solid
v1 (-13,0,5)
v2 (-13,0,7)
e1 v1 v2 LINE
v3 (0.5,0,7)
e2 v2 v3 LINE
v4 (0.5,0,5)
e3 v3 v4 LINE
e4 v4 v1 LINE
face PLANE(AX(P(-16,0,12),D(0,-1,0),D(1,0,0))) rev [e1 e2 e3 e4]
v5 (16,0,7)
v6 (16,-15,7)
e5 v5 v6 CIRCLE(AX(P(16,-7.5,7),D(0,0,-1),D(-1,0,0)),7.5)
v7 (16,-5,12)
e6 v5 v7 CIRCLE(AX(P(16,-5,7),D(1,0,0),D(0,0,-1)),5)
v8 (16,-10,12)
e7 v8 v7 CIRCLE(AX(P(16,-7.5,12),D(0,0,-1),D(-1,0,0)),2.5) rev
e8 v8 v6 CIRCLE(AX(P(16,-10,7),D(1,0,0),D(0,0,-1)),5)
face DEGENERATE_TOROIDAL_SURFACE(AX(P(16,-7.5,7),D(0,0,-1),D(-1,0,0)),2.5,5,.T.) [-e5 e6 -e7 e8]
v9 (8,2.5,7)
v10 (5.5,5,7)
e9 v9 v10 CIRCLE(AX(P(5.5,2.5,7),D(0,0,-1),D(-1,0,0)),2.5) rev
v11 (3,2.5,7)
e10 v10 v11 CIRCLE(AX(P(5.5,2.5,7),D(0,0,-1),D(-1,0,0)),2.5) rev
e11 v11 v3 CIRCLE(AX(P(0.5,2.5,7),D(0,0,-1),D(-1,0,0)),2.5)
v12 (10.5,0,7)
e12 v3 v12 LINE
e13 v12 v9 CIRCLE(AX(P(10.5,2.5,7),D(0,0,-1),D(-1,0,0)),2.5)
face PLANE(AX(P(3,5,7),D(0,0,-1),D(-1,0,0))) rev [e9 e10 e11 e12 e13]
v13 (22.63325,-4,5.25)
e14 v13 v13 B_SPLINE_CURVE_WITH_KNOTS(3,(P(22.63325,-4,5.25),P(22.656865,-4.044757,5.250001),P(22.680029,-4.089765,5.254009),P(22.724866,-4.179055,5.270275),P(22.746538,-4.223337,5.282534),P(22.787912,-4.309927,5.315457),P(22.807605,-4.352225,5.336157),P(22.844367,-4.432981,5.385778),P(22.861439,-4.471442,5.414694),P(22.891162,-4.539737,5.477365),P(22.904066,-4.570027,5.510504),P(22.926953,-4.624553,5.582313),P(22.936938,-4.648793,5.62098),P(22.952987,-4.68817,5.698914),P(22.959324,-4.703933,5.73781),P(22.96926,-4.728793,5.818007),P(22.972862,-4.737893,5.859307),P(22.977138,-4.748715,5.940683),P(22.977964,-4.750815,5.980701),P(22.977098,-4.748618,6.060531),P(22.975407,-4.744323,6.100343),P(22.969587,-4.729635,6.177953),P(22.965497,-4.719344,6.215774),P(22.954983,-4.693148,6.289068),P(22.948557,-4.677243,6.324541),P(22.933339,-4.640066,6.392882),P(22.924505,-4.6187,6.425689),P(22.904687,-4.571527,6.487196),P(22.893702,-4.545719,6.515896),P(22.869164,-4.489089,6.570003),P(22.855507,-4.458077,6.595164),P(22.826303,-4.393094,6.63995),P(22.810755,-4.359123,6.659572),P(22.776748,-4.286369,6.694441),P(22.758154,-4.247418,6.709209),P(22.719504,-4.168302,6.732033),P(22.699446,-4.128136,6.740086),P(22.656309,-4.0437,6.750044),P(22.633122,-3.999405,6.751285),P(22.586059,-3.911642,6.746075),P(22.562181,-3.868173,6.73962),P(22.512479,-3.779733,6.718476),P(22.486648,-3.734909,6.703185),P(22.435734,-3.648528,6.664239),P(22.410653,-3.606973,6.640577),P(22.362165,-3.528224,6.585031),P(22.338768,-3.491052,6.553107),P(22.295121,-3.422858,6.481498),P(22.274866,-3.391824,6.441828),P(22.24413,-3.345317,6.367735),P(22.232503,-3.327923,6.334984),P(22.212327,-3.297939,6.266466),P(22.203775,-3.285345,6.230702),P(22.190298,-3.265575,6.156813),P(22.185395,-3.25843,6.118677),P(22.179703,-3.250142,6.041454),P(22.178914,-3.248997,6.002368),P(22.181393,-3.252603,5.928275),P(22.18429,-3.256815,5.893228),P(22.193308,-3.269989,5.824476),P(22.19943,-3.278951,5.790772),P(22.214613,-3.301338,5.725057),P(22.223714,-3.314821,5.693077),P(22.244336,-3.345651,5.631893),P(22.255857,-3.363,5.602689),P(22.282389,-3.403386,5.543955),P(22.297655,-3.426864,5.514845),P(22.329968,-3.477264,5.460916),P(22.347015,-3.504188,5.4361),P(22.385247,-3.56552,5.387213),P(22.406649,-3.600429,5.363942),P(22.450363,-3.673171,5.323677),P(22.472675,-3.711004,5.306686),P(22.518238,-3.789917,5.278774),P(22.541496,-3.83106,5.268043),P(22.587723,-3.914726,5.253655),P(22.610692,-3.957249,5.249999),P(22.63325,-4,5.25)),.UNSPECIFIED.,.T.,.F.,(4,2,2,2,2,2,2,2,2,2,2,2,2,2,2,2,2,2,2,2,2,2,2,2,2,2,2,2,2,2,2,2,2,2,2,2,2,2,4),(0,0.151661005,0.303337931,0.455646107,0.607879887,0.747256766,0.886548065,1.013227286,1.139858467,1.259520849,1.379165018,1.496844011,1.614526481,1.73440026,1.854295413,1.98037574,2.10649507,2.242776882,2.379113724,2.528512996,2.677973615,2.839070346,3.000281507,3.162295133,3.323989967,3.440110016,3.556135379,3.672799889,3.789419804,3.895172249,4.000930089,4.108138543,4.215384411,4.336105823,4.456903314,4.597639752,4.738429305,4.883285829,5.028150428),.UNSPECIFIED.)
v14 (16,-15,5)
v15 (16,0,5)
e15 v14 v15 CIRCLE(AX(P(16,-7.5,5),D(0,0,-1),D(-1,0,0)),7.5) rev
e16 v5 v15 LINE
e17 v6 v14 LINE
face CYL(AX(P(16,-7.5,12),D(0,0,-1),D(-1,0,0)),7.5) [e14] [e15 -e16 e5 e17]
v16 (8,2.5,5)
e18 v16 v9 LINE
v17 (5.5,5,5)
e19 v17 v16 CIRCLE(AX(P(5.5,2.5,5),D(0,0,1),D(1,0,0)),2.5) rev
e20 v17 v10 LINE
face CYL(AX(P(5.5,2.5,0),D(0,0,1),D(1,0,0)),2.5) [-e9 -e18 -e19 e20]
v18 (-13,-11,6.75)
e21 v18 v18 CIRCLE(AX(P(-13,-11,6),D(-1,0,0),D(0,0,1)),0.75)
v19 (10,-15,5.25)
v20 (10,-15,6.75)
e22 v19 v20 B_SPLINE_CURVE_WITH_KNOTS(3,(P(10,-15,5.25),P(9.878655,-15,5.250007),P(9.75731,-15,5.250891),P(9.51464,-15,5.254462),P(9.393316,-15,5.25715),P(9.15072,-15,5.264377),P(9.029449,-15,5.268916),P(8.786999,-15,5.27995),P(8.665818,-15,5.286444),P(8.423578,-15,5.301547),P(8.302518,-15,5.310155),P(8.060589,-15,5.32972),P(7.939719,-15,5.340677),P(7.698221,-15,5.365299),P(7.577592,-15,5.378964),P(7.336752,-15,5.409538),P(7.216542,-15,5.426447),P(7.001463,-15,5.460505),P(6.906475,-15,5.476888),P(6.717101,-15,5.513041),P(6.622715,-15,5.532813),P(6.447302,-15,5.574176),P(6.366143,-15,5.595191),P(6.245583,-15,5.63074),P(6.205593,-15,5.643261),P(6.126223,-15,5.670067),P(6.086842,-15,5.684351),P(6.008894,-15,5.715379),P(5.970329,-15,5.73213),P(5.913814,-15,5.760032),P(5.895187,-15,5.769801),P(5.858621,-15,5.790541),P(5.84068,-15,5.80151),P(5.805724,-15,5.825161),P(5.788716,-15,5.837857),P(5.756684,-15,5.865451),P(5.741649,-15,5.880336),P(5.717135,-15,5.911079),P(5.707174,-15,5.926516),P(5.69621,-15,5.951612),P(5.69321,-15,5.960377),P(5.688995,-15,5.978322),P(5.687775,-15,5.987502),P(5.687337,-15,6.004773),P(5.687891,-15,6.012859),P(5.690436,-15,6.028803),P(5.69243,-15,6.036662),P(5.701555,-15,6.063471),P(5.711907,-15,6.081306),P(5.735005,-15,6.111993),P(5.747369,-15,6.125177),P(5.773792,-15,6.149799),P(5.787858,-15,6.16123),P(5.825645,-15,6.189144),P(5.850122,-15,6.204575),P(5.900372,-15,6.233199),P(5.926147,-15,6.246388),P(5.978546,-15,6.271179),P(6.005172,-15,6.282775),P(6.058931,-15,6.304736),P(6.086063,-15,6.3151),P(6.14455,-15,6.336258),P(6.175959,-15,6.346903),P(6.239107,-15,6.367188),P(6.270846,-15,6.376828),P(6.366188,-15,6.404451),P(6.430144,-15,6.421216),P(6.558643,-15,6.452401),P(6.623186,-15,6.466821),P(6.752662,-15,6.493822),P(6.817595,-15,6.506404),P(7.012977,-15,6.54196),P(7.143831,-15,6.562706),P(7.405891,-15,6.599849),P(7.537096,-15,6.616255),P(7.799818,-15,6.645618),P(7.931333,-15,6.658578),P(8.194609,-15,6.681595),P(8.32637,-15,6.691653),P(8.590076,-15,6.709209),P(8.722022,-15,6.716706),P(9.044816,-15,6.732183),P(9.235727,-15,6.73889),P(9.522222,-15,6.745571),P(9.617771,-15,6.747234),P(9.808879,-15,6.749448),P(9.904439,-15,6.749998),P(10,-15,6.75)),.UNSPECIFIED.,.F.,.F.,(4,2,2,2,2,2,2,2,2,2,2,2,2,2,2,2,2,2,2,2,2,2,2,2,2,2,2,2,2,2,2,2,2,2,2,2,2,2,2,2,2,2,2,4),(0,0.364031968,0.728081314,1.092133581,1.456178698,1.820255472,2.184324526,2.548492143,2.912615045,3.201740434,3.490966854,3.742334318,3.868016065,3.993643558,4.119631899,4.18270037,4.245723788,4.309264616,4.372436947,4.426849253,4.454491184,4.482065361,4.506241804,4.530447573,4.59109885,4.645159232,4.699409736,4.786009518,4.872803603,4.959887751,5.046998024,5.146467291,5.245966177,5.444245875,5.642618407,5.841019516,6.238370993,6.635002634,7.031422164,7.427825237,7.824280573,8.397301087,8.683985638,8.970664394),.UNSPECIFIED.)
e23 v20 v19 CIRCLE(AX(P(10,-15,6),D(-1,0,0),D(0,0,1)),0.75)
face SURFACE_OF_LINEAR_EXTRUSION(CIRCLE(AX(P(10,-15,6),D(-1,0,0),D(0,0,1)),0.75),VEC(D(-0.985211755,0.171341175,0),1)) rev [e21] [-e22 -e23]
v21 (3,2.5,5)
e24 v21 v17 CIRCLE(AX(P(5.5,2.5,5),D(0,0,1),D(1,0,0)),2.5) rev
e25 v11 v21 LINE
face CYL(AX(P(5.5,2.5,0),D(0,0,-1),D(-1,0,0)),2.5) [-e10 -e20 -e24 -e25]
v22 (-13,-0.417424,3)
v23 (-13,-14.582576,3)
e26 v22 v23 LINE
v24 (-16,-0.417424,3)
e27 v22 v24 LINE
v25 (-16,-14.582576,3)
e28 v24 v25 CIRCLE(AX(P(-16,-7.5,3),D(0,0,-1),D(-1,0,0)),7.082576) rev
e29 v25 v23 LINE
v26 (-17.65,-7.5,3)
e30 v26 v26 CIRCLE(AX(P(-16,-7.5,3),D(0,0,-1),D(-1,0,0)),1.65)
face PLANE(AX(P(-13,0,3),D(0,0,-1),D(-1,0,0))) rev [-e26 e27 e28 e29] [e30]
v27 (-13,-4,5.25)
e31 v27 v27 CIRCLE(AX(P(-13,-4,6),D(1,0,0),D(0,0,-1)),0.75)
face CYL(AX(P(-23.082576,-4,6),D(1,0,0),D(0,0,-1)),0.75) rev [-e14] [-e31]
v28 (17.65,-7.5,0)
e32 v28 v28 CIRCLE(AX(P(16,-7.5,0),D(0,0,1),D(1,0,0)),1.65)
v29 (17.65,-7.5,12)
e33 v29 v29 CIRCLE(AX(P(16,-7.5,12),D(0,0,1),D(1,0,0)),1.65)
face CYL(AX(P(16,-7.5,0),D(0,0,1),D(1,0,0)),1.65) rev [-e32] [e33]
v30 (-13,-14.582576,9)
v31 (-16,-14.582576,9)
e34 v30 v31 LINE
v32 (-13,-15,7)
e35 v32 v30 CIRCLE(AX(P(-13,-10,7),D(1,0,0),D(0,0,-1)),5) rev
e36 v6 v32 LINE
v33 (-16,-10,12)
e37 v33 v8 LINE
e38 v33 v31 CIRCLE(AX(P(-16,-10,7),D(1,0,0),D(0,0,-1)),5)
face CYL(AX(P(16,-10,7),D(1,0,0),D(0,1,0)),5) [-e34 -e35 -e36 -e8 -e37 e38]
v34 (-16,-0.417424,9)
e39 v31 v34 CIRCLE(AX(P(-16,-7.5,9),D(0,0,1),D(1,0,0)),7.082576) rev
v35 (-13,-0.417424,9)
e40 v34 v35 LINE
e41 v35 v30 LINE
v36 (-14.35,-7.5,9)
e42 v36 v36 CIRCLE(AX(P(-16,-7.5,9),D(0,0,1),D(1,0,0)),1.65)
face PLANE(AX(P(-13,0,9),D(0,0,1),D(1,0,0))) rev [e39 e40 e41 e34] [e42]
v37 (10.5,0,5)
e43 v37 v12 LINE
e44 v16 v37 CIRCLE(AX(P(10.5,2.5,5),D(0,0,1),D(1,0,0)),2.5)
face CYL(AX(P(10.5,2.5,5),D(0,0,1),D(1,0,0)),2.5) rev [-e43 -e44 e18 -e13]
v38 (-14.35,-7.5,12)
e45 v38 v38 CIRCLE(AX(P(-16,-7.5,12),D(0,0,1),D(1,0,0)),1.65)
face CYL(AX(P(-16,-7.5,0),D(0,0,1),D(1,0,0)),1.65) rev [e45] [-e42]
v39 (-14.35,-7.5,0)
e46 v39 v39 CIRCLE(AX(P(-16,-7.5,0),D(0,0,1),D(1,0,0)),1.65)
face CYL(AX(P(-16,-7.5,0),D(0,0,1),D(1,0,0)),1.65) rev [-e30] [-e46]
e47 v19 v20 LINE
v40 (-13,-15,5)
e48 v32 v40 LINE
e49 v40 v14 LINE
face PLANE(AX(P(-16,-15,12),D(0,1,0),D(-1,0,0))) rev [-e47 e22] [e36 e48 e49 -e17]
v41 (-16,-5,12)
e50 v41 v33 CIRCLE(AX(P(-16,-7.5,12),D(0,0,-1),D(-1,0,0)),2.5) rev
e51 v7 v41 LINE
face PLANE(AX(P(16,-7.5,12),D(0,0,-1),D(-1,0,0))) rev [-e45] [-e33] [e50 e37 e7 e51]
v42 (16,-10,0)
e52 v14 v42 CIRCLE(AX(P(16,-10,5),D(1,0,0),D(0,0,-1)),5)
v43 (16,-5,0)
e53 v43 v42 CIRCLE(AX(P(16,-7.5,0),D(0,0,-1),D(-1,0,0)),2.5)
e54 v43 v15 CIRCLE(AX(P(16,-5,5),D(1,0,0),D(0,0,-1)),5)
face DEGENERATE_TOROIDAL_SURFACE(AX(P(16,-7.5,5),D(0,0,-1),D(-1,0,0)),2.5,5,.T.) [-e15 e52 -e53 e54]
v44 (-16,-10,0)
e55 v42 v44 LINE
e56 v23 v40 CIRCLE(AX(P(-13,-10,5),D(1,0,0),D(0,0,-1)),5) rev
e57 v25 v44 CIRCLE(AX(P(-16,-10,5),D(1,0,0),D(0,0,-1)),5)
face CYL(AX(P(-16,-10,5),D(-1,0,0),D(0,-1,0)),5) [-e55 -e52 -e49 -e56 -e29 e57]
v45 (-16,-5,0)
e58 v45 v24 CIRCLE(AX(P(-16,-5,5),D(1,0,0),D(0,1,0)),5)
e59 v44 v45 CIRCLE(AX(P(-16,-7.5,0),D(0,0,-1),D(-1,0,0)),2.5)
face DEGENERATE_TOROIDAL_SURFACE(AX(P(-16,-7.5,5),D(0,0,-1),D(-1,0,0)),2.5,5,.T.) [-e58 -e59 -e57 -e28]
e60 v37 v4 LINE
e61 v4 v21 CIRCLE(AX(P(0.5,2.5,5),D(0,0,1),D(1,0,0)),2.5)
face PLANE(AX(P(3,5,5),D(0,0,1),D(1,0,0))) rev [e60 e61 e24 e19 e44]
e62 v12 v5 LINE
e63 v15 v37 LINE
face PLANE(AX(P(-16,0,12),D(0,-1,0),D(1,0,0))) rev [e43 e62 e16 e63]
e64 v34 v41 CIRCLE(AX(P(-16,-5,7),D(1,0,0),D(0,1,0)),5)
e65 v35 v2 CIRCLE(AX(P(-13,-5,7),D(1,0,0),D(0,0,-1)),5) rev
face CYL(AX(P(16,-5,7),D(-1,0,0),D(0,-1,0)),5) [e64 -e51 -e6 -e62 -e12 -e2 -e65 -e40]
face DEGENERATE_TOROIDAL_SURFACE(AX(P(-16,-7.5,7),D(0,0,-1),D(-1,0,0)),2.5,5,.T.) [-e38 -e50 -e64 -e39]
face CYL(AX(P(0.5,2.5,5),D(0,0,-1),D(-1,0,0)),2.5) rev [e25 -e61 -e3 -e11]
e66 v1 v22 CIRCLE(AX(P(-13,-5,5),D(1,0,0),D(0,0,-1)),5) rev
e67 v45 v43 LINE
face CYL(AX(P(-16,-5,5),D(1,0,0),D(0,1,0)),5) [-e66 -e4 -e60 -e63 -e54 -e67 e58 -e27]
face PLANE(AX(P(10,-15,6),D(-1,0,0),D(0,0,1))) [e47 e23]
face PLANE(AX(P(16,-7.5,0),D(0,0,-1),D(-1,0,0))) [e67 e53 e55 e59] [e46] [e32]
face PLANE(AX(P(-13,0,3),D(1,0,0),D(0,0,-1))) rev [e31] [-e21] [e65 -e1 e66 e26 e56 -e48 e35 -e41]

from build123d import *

# Parameters (mm, degrees)
BOSS_EXTRUDE1_DEPTH = 12
FILLET1_R           = 5
SKETCH5_W           = 10.5
SKETCH5_H           = 6
CUT_EXTRUDE3_DEPTH  = 37.349002737
SKETCH6_W           = 5
SKETCH6_H           = 2
BOSS_EXTRUDE2_DEPTH = 5
FILLET2_R           = 2.5
FILLET3_R           = 2.5
SKETCH3_R           = 1.65
CUT_EXTRUDE4_DEPTH  = 31.352100461
SKETCH8_R           = 0.75
CUT_EXTRUDE7_DEPTH  = 51.387859352
SKETCH9_R           = 0.75
CUT_EXTRUDE9_DEPTH  = 23.34523506


with BuildPart() as part:
    # Sketch2 → Boss-Extrude1 (new body)
    with BuildSketch(Plane.XY):
        with BuildLine():
            Line((-16, 0), (16, 0))
            ThreePointArc((16, 0), (23.5, -7.5), (16, -15))
            Line((16, -15), (-16, -15))
            ThreePointArc((-16, -15), (-23.5, -7.5), (-16, 0))
        make_face()
    extrude(amount=BOSS_EXTRUDE1_DEPTH)

    # Fillet1
    fillet1_edges = [part.edges().sort_by_distance(p)[0] for p in [
        (-23.5, -7.5, 12),
        (0, -15, 12),
        (23.5, -7.5, 12),
        (0, -15, 0),
        (-23.5, -7.5, 0),
        (0, 0, 0),
        (23.5, -7.5, 0),
        (0, 0, 12),
    ]]
    fillet(fillet1_edges, radius=FILLET1_R)

    # Sketch5 → Cut-Extrude3 (cut, through all)
    with BuildSketch(Plane(origin=(0, -25, 0), x_dir=(-1, 0, 0), z_dir=(0, -1, 0))):
        with Locations((18.25, -6)):
            Rectangle(SKETCH5_W, SKETCH5_H)
    extrude(amount=-CUT_EXTRUDE3_DEPTH, mode=Mode.SUBTRACT)

    # Sketch6 → Boss-Extrude2 (add)
    with BuildSketch(Plane(origin=(0, 0, 0), x_dir=(1, 0, 0), z_dir=(0, 1, 0))):
        with Locations((5.5, -6)):
            Rectangle(SKETCH6_W, SKETCH6_H)
    extrude(amount=BOSS_EXTRUDE2_DEPTH)

    # Fillet2
    fillet2_edges = [part.edges().sort_by_distance(p)[0] for p in [
        (8, 5, 6),
        (3, 5, 6),
    ]]
    fillet(fillet2_edges, radius=FILLET2_R - 0.0001)  # a hair under: the kernel refuses the full size

    # Fillet3
    fillet3_edges = [part.edges().sort_by_distance(p)[0] for p in [
        (3, 0, 6),
        (8, 0, 6),
    ]]
    fillet(fillet3_edges, radius=FILLET3_R)

    # Sketch3 → Cut-Extrude4 (cut, through all)
    with BuildSketch(Plane.XY.offset(12)):
        with Locations((-16, -7.5)):
            Circle(SKETCH3_R)
        with Locations((16, -7.5)):
            Circle(SKETCH3_R)
    extrude(amount=-CUT_EXTRUDE4_DEPTH, mode=Mode.SUBTRACT)

    # Sketch8 → Cut-Extrude7 (cut, through all)
    with BuildSketch(Plane(origin=(23.5, 0, 0), x_dir=(0, 0, -1), z_dir=(1, 0, 0))):
        with Locations((-6, -4)):
            Circle(SKETCH8_R)
    extrude(amount=-CUT_EXTRUDE7_DEPTH, mode=Mode.SUBTRACT)

    # Sketch9 → Cut-Extrude9 (cut, along a direction that is not the sketch's normal)
    with BuildSketch(Plane.ZY.offset(13)):
        with Locations((6, -11)):
            Circle(SKETCH9_R)
    extrude(amount=-CUT_EXTRUDE9_DEPTH, dir=(-0.9852117548196745, 0.17134117475124766, 0), mode=Mode.SUBTRACT)


solid = part.part
